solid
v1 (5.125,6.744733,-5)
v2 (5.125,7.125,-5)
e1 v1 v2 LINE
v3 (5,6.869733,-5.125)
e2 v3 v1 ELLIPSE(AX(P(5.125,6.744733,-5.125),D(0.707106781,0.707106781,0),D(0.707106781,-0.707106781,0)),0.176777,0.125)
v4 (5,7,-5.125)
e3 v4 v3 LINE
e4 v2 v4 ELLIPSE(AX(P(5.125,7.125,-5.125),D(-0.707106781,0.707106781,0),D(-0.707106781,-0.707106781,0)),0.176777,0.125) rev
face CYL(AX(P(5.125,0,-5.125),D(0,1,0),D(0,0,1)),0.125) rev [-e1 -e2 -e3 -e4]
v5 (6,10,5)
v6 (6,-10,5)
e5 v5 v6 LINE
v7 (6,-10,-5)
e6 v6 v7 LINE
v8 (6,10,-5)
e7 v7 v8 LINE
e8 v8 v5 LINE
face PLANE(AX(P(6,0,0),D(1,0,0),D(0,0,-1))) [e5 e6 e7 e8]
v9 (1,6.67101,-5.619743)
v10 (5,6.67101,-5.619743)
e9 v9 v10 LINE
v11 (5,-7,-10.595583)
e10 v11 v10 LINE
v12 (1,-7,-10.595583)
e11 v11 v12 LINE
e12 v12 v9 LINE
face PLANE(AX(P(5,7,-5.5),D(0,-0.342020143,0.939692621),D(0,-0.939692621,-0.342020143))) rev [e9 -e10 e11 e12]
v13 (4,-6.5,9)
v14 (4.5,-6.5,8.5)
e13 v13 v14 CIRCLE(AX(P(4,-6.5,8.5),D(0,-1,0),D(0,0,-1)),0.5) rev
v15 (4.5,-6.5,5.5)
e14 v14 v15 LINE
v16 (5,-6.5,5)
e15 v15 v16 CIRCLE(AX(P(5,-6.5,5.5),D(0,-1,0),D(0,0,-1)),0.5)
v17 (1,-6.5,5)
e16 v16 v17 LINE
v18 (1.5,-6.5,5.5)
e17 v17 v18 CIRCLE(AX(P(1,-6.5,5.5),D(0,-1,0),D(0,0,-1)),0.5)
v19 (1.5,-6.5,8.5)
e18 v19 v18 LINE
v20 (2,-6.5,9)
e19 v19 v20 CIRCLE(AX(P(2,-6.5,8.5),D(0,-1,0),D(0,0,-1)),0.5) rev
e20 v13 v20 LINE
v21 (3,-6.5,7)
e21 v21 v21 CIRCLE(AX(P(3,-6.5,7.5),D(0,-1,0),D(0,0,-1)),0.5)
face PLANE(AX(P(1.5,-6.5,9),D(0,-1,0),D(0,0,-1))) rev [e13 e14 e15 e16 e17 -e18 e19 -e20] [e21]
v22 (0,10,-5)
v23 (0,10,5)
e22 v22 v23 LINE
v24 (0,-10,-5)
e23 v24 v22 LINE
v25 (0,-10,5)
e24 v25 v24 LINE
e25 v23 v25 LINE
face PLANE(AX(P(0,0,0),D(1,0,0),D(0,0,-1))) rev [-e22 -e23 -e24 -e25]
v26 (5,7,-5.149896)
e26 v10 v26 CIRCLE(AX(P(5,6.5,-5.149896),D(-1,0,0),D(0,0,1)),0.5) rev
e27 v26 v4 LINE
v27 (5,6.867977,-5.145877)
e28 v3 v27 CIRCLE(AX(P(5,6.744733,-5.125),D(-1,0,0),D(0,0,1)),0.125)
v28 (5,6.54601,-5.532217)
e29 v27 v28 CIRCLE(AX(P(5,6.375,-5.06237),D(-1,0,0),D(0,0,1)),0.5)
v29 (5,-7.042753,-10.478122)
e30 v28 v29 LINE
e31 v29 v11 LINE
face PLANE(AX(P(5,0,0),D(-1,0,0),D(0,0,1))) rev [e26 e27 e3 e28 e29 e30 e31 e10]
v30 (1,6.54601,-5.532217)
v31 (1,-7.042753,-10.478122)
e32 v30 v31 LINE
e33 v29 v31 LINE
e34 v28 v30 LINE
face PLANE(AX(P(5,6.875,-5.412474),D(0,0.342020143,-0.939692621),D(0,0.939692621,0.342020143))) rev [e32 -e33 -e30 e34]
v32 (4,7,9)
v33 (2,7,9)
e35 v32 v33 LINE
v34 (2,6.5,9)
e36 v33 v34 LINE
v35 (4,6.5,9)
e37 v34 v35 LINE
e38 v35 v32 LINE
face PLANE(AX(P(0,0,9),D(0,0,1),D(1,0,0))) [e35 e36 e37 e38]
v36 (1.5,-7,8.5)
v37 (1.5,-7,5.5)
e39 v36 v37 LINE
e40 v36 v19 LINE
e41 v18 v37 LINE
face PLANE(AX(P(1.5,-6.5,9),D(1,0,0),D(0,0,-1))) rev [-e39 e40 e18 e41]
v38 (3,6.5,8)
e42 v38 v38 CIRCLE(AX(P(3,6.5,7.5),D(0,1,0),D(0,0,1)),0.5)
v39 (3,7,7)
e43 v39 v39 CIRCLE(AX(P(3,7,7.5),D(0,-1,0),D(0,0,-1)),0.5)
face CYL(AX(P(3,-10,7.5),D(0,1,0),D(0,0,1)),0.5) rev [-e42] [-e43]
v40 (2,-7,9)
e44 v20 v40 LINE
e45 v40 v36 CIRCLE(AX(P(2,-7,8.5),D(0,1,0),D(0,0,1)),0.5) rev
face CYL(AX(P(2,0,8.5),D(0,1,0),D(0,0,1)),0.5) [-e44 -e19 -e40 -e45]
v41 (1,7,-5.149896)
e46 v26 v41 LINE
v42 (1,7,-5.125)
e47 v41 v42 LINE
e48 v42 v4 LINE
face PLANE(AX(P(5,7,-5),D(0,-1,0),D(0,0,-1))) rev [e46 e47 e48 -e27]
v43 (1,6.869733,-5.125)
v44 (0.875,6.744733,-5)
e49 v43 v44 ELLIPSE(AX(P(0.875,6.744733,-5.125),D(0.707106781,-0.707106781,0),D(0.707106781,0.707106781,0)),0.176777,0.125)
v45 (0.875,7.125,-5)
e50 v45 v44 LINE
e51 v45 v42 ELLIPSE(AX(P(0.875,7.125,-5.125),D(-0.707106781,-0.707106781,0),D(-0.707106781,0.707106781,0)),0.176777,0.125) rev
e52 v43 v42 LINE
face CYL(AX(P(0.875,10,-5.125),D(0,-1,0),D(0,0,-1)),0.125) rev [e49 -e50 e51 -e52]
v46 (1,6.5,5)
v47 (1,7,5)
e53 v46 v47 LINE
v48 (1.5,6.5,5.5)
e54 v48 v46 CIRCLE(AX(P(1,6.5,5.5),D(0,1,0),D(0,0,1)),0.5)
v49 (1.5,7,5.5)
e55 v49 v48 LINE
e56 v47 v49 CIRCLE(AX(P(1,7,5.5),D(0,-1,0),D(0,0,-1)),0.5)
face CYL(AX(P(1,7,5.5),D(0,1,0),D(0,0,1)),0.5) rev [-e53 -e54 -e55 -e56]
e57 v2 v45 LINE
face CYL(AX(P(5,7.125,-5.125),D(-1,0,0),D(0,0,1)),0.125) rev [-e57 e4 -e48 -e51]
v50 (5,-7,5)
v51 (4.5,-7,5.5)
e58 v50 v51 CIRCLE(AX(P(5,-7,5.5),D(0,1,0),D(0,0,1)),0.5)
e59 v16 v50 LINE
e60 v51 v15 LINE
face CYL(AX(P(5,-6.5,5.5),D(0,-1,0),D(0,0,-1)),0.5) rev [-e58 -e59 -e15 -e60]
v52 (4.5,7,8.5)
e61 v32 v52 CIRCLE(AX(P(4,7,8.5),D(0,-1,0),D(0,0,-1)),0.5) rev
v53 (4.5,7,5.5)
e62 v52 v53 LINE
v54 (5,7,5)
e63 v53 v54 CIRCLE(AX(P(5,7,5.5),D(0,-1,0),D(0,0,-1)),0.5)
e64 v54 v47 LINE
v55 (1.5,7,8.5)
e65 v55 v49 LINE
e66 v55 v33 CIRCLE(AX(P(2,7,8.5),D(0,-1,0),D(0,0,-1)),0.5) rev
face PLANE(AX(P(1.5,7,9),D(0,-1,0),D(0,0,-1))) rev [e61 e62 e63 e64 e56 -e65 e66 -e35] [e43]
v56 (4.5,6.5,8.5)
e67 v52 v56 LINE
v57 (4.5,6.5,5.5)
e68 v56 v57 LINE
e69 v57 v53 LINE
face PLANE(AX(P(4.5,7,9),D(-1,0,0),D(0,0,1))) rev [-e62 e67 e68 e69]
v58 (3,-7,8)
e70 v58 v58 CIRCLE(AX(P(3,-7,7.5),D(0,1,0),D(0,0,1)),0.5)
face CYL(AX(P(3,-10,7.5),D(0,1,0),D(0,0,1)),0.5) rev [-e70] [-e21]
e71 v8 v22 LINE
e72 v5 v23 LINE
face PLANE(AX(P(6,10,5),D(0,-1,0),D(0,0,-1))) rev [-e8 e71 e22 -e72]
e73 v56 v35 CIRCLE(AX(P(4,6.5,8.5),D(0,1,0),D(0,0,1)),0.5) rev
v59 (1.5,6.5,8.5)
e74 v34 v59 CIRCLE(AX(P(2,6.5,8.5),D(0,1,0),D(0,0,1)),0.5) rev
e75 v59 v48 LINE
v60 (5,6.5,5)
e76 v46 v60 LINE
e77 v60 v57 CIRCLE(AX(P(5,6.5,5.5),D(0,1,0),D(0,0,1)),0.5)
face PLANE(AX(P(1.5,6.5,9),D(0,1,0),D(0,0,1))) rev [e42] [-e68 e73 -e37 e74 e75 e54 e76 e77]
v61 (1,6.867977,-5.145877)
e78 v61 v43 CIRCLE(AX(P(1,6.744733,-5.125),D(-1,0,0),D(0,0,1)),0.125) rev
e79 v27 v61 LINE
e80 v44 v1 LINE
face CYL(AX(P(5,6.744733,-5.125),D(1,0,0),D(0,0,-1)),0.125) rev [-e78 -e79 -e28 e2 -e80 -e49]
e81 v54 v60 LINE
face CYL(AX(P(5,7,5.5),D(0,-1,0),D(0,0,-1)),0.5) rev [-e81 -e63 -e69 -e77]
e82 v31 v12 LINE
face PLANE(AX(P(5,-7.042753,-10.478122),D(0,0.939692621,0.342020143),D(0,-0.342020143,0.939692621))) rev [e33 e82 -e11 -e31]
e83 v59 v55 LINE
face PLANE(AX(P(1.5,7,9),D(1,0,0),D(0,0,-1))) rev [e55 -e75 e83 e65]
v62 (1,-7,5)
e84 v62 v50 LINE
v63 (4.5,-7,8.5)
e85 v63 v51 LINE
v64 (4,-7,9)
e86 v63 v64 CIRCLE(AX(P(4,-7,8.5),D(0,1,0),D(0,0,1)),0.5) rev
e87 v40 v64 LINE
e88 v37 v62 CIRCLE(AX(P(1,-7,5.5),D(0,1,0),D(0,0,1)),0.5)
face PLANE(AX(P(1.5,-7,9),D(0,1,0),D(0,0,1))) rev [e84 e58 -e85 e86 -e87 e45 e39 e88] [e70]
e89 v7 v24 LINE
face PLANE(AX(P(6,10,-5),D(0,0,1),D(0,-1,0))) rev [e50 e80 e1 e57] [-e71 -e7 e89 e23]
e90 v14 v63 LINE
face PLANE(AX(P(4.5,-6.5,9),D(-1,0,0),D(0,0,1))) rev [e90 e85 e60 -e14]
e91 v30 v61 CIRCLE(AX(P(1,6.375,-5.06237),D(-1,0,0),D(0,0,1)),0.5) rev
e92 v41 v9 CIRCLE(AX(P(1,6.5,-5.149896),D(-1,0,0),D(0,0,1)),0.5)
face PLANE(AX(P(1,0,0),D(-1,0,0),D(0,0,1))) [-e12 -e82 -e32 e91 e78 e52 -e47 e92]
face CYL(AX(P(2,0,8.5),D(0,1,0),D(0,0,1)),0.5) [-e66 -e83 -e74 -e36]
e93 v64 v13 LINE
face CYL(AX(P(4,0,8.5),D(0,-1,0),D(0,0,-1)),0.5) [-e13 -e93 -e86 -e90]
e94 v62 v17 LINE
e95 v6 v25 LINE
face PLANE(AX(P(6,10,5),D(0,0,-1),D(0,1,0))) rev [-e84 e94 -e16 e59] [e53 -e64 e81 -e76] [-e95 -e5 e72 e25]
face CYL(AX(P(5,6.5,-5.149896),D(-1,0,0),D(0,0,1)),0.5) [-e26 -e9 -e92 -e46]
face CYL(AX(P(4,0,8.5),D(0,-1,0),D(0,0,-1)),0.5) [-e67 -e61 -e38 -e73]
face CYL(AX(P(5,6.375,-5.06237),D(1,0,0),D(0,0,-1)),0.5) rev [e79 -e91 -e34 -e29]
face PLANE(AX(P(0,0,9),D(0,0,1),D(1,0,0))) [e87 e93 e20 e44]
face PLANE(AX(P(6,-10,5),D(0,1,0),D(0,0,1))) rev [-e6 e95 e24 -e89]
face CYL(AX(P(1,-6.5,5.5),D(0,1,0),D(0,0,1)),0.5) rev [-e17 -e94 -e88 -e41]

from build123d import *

# Parameters (mm, degrees)
SKETCH1_W               = 10
SKETCH1_H               = 20
BOSS_EXTRUDE1_DEPTH     = 6
SKETCH2_W               = 3
SKETCH2_H               = 0.5
BOSS_EXTRUDE2_DEPTH     = 4
FILLET1_R               = 0.5
CUT_EXTRUDE1_DEPTH      = 21.14944168
CUT_EXTRUDE1_DEPTH_BACK = 21.14944168
SKETCH3_R               = 0.5
BOSS_EXTRUDE3_DEPTH     = 2
FILLET2_R               = 0.5
FILLET3_R               = 0.125


with BuildPart() as part:
    # Sketch1 → Boss-Extrude1 (new body)
    with BuildSketch(Plane(origin=(0, 0, 0), x_dir=(0, 0, -1), z_dir=(1, 0, 0))):
        Rectangle(SKETCH1_W, SKETCH1_H)
    extrude(amount=BOSS_EXTRUDE1_DEPTH)

    # Sketch2 → Boss-Extrude2 (add)
    with BuildSketch(Plane.XY.offset(5)):
        with Locations((3, 6.75)):
            Rectangle(SKETCH2_W, SKETCH2_H)
        with Locations((3, -6.75)):
            Rectangle(SKETCH2_W, SKETCH2_H)
    extrude(amount=BOSS_EXTRUDE2_DEPTH)

    # Fillet1
    fillet1_edges = [part.edges().sort_by_distance(p)[0] for p in [
        (1.5, 6.75, 5),
        (4.5, 6.75, 5),
        (1.5, 6.75, 9),
        (4.5, 6.75, 9),
        (1.5, -6.75, 5),
        (4.5, -6.75, 5),
        (1.5, -6.75, 9),
        (4.5, -6.75, 9),
    ]]
    fillet(fillet1_edges, radius=FILLET1_R)

    # Sketch3 → Cut-Extrude1 (cut, two sides: drawn at the far end of the back side and taken through both)
    with BuildSketch(Plane(origin=(0, 7, 0), x_dir=(1, 0, 0), z_dir=(0, 1, 0)).offset(-CUT_EXTRUDE1_DEPTH_BACK)):
        with Locations(Location((3, -7.5, 0), (0, 0, 270))):
            Circle(SKETCH3_R)
    extrude(amount=CUT_EXTRUDE1_DEPTH + CUT_EXTRUDE1_DEPTH_BACK, mode=Mode.SUBTRACT)

    # Sketch4 → Boss-Extrude3 (add, symmetric)
    with BuildSketch(Plane(origin=(3, 0, 0), x_dir=(0, 0, -1), z_dir=(1, 0, 0))):
        Polygon((5, 7), (5.5, 7), (10.59558328, -7), (10.478121702, -7.042752518), (5.412474058, 6.875), (5, 6.875), (4.5, 6.875), (4.5, 7), align=None)
    extrude(amount=BOSS_EXTRUDE3_DEPTH, both=True)

    # Fillet2
    fillet2_edges = [part.edges().sort_by_distance(p)[0] for p in [
        (3, 7, -5.5),
        (3, 6.875, -5.412474058),
    ]]
    fillet(fillet2_edges, radius=FILLET2_R)

    # Fillet3
    # the kernel refuses this fillet: 0.125 mm, written as the material it adds along each edge
    with BuildSketch(Plane(origin=(1, 6.875, -5), x_dir=(-1, 0, 0), z_dir=(0, 1, 0)), Plane(origin=(5, 6.875, -5), x_dir=(0, 0, -1), z_dir=(0, 1, 0))) as fillet3_piece_1:
        with BuildLine():
            CenterArc((FILLET3_R, -FILLET3_R), FILLET3_R, 90, 90)
            Line((0, -FILLET3_R), (-FILLET3_R * 0.02, -FILLET3_R))
            Line((-FILLET3_R * 0.02, -FILLET3_R), (-FILLET3_R * 0.02, FILLET3_R * 0.02))
            Line((-FILLET3_R * 0.02, FILLET3_R * 0.02), (FILLET3_R, FILLET3_R * 0.02))
            Line((FILLET3_R, FILLET3_R * 0.02), (FILLET3_R, 0))
        make_face()
    extrude(amount=0.125)
    with BuildSketch(Plane(origin=(1, 6.875, -5), x_dir=(0, -1, 0), z_dir=(1, 0, 0))) as fillet3_piece_2:
        with BuildLine():
            CenterArc((0.130266962, 0.125), FILLET3_R, 170.385831611, 99.614168389)
            Line((0.007022616, 0.14587657), (-0.005301818, 0.147964228))
            ThreePointArc((-0.005301818, 0.147964228), (-0.0125, 0.062370289), (-0.0125, 0))
            Line((-0.0125, 0), (0, -0.0125))
            Line((0, -0.0125), (0.130266962, -0.0125))
            Line((0.130266962, -0.0125), (0.130266962, 0))
        make_face()
    extrude(amount=4)
    with BuildSketch(Plane(origin=(5, 7, -5), x_dir=(0, 0, -1), z_dir=(-1, 0, 0))) as fillet3_piece_3:
        with BuildLine():
            CenterArc((FILLET3_R, -FILLET3_R), FILLET3_R, 90, 90)
            Line((0, -FILLET3_R), (-FILLET3_R * 0.02, -FILLET3_R))
            Line((-FILLET3_R * 0.02, -FILLET3_R), (-FILLET3_R * 0.02, FILLET3_R * 0.02))
            Line((-FILLET3_R * 0.02, FILLET3_R * 0.02), (FILLET3_R, FILLET3_R * 0.02))
            Line((FILLET3_R, FILLET3_R * 0.02), (FILLET3_R, 0))
        make_face()
    extrude(amount=4)
    with BuildSketch(Plane(origin=(0.634886225, 6.875, -5), x_dir=(0, -1, 0), z_dir=(1, 0, 0))) as fillet3_piece_4a_section:
        with BuildLine():
            CenterArc((0.130266962, 0.125), FILLET3_R, 170.385831611, 99.614168389)
            Line((0.007022616, 0.14587657), (-0.005301818, 0.147964228))
            ThreePointArc((-0.005301818, 0.147964228), (-0.0125, 0.062370289), (-0.0125, 0))
            Line((-0.0125, 0), (0, -0.0125))
            Line((0, -0.0125), (0.130266962, -0.0125))
            Line((0.130266962, -0.0125), (0.130266962, 0))
        make_face()
    fillet3_piece_4a = extrude(amount=4.365113775, mode=Mode.PRIVATE)
    fillet3_piece_4a = split(fillet3_piece_4a, bisect_by=Plane(origin=(1, 6.846895643, -5.033240906), z_dir=(-1, 0, 0)), keep=Keep.TOP, mode=Mode.PRIVATE)
    with BuildSketch(Plane(origin=(1, 6.5625, -5), x_dir=(-1, 0, 0), z_dir=(0, 1, 0))) as fillet3_piece_4b_section:
        with BuildLine():
            CenterArc((FILLET3_R, -FILLET3_R), FILLET3_R, 90, 90)
            Line((0, -FILLET3_R), (-FILLET3_R * 0.02, -FILLET3_R))
            Line((-FILLET3_R * 0.02, -FILLET3_R), (-FILLET3_R * 0.02, FILLET3_R * 0.02))
            Line((-FILLET3_R * 0.02, FILLET3_R * 0.02), (FILLET3_R, FILLET3_R * 0.02))
            Line((FILLET3_R, FILLET3_R * 0.02), (FILLET3_R, 0))
        make_face()
    fillet3_piece_4b = extrude(amount=0.4375, mode=Mode.PRIVATE)
    fillet3_piece_4b = split(fillet3_piece_4b, bisect_by=Plane(origin=(0.971700611, 6.875, -5.028299389), z_dir=(0, -1, 0)), keep=Keep.TOP, mode=Mode.PRIVATE)
    fillet3_piece_4 = fillet3_piece_4a & fillet3_piece_4b
    add(fillet3_piece_4)
    with BuildSketch(Plane(origin=(5, 7, -5), x_dir=(0, 0, -1), z_dir=(-1, 0, 0))) as fillet3_piece_5a_section:
        with BuildLine():
            CenterArc((FILLET3_R, -FILLET3_R), FILLET3_R, 90, 90)
            Line((0, -FILLET3_R), (-FILLET3_R * 0.02, -FILLET3_R))
            Line((-FILLET3_R * 0.02, -FILLET3_R), (-FILLET3_R * 0.02, FILLET3_R * 0.02))
            Line((-FILLET3_R * 0.02, FILLET3_R * 0.02), (FILLET3_R, FILLET3_R * 0.02))
            Line((FILLET3_R, FILLET3_R * 0.02), (FILLET3_R, 0))
        make_face()
    fillet3_piece_5a = extrude(amount=4.3125, mode=Mode.PRIVATE)
    fillet3_piece_5a = split(fillet3_piece_5a, bisect_by=Plane(origin=(1, 7.028299389, -5.028299389), z_dir=(-1, 0, 0)), keep=Keep.TOP, mode=Mode.PRIVATE)
    with BuildSketch(Plane(origin=(1, 6.875, -5), x_dir=(-1, 0, 0), z_dir=(0, 1, 0))) as fillet3_piece_5b_section:
        with BuildLine():
            CenterArc((FILLET3_R, -FILLET3_R), FILLET3_R, 90, 90)
            Line((0, -FILLET3_R), (-FILLET3_R * 0.02, -FILLET3_R))
            Line((-FILLET3_R * 0.02, -FILLET3_R), (-FILLET3_R * 0.02, FILLET3_R * 0.02))
            Line((-FILLET3_R * 0.02, FILLET3_R * 0.02), (FILLET3_R, FILLET3_R * 0.02))
            Line((FILLET3_R, FILLET3_R * 0.02), (FILLET3_R, 0))
        make_face()
    fillet3_piece_5b = extrude(amount=0.4375, mode=Mode.PRIVATE)
    fillet3_piece_5b = split(fillet3_piece_5b, bisect_by=Plane(origin=(0.971700611, 7, -5.028299389), z_dir=(0, 1, 0)), keep=Keep.TOP, mode=Mode.PRIVATE)
    fillet3_piece_5 = fillet3_piece_5a & fillet3_piece_5b
    add(fillet3_piece_5)
    with BuildSketch(Plane(origin=(5, 6.5625, -5), x_dir=(0, 0, -1), z_dir=(0, 1, 0))) as fillet3_piece_6a_section:
        with BuildLine():
            CenterArc((FILLET3_R, -FILLET3_R), FILLET3_R, 90, 90)
            Line((0, -FILLET3_R), (-FILLET3_R * 0.02, -FILLET3_R))
            Line((-FILLET3_R * 0.02, -FILLET3_R), (-FILLET3_R * 0.02, FILLET3_R * 0.02))
            Line((-FILLET3_R * 0.02, FILLET3_R * 0.02), (FILLET3_R, FILLET3_R * 0.02))
            Line((FILLET3_R, FILLET3_R * 0.02), (FILLET3_R, 0))
        make_face()
    fillet3_piece_6a = extrude(amount=0.4375, mode=Mode.PRIVATE)
    fillet3_piece_6a = split(fillet3_piece_6a, bisect_by=Plane(origin=(5.028299389, 6.875, -5.028299389), z_dir=(0, -1, 0)), keep=Keep.TOP, mode=Mode.PRIVATE)
    with BuildSketch(Plane(origin=(1, 6.875, -5), x_dir=(0, -1, 0), z_dir=(1, 0, 0))) as fillet3_piece_6b_section:
        with BuildLine():
            CenterArc((0.130266962, 0.125), FILLET3_R, 170.385831611, 99.614168389)
            Line((0.007022616, 0.14587657), (-0.005301818, 0.147964228))
            ThreePointArc((-0.005301818, 0.147964228), (-0.0125, 0.062370289), (-0.0125, 0))
            Line((-0.0125, 0), (0, -0.0125))
            Line((0, -0.0125), (0.130266962, -0.0125))
            Line((0.130266962, -0.0125), (0.130266962, 0))
        make_face()
    fillet3_piece_6b = extrude(amount=4.365113775, mode=Mode.PRIVATE)
    fillet3_piece_6b = split(fillet3_piece_6b, bisect_by=Plane(origin=(5, 6.846895643, -5.033240906), z_dir=(1, 0, 0)), keep=Keep.TOP, mode=Mode.PRIVATE)
    fillet3_piece_6 = fillet3_piece_6a & fillet3_piece_6b
    add(fillet3_piece_6)
    with BuildSketch(Plane(origin=(5, 6.875, -5), x_dir=(0, 0, -1), z_dir=(0, 1, 0))) as fillet3_piece_7a_section:
        with BuildLine():
            CenterArc((FILLET3_R, -FILLET3_R), FILLET3_R, 90, 90)
            Line((0, -FILLET3_R), (-FILLET3_R * 0.02, -FILLET3_R))
            Line((-FILLET3_R * 0.02, -FILLET3_R), (-FILLET3_R * 0.02, FILLET3_R * 0.02))
            Line((-FILLET3_R * 0.02, FILLET3_R * 0.02), (FILLET3_R, FILLET3_R * 0.02))
            Line((FILLET3_R, FILLET3_R * 0.02), (FILLET3_R, 0))
        make_face()
    fillet3_piece_7a = extrude(amount=0.4375, mode=Mode.PRIVATE)
    fillet3_piece_7a = split(fillet3_piece_7a, bisect_by=Plane(origin=(5.028299389, 7, -5.028299389), z_dir=(0, 1, 0)), keep=Keep.TOP, mode=Mode.PRIVATE)
    with BuildSketch(Plane(origin=(5.3125, 7, -5), x_dir=(0, 0, -1), z_dir=(-1, 0, 0))) as fillet3_piece_7b_section:
        with BuildLine():
            CenterArc((FILLET3_R, -FILLET3_R), FILLET3_R, 90, 90)
            Line((0, -FILLET3_R), (-FILLET3_R * 0.02, -FILLET3_R))
            Line((-FILLET3_R * 0.02, -FILLET3_R), (-FILLET3_R * 0.02, FILLET3_R * 0.02))
            Line((-FILLET3_R * 0.02, FILLET3_R * 0.02), (FILLET3_R, FILLET3_R * 0.02))
            Line((FILLET3_R, FILLET3_R * 0.02), (FILLET3_R, 0))
        make_face()
    fillet3_piece_7b = extrude(amount=4.3125, mode=Mode.PRIVATE)
    fillet3_piece_7b = split(fillet3_piece_7b, bisect_by=Plane(origin=(5, 7.028299389, -5.028299389), z_dir=(1, 0, 0)), keep=Keep.TOP, mode=Mode.PRIVATE)
    fillet3_piece_7 = fillet3_piece_7a & fillet3_piece_7b
    add(fillet3_piece_7)


solid = part.part
